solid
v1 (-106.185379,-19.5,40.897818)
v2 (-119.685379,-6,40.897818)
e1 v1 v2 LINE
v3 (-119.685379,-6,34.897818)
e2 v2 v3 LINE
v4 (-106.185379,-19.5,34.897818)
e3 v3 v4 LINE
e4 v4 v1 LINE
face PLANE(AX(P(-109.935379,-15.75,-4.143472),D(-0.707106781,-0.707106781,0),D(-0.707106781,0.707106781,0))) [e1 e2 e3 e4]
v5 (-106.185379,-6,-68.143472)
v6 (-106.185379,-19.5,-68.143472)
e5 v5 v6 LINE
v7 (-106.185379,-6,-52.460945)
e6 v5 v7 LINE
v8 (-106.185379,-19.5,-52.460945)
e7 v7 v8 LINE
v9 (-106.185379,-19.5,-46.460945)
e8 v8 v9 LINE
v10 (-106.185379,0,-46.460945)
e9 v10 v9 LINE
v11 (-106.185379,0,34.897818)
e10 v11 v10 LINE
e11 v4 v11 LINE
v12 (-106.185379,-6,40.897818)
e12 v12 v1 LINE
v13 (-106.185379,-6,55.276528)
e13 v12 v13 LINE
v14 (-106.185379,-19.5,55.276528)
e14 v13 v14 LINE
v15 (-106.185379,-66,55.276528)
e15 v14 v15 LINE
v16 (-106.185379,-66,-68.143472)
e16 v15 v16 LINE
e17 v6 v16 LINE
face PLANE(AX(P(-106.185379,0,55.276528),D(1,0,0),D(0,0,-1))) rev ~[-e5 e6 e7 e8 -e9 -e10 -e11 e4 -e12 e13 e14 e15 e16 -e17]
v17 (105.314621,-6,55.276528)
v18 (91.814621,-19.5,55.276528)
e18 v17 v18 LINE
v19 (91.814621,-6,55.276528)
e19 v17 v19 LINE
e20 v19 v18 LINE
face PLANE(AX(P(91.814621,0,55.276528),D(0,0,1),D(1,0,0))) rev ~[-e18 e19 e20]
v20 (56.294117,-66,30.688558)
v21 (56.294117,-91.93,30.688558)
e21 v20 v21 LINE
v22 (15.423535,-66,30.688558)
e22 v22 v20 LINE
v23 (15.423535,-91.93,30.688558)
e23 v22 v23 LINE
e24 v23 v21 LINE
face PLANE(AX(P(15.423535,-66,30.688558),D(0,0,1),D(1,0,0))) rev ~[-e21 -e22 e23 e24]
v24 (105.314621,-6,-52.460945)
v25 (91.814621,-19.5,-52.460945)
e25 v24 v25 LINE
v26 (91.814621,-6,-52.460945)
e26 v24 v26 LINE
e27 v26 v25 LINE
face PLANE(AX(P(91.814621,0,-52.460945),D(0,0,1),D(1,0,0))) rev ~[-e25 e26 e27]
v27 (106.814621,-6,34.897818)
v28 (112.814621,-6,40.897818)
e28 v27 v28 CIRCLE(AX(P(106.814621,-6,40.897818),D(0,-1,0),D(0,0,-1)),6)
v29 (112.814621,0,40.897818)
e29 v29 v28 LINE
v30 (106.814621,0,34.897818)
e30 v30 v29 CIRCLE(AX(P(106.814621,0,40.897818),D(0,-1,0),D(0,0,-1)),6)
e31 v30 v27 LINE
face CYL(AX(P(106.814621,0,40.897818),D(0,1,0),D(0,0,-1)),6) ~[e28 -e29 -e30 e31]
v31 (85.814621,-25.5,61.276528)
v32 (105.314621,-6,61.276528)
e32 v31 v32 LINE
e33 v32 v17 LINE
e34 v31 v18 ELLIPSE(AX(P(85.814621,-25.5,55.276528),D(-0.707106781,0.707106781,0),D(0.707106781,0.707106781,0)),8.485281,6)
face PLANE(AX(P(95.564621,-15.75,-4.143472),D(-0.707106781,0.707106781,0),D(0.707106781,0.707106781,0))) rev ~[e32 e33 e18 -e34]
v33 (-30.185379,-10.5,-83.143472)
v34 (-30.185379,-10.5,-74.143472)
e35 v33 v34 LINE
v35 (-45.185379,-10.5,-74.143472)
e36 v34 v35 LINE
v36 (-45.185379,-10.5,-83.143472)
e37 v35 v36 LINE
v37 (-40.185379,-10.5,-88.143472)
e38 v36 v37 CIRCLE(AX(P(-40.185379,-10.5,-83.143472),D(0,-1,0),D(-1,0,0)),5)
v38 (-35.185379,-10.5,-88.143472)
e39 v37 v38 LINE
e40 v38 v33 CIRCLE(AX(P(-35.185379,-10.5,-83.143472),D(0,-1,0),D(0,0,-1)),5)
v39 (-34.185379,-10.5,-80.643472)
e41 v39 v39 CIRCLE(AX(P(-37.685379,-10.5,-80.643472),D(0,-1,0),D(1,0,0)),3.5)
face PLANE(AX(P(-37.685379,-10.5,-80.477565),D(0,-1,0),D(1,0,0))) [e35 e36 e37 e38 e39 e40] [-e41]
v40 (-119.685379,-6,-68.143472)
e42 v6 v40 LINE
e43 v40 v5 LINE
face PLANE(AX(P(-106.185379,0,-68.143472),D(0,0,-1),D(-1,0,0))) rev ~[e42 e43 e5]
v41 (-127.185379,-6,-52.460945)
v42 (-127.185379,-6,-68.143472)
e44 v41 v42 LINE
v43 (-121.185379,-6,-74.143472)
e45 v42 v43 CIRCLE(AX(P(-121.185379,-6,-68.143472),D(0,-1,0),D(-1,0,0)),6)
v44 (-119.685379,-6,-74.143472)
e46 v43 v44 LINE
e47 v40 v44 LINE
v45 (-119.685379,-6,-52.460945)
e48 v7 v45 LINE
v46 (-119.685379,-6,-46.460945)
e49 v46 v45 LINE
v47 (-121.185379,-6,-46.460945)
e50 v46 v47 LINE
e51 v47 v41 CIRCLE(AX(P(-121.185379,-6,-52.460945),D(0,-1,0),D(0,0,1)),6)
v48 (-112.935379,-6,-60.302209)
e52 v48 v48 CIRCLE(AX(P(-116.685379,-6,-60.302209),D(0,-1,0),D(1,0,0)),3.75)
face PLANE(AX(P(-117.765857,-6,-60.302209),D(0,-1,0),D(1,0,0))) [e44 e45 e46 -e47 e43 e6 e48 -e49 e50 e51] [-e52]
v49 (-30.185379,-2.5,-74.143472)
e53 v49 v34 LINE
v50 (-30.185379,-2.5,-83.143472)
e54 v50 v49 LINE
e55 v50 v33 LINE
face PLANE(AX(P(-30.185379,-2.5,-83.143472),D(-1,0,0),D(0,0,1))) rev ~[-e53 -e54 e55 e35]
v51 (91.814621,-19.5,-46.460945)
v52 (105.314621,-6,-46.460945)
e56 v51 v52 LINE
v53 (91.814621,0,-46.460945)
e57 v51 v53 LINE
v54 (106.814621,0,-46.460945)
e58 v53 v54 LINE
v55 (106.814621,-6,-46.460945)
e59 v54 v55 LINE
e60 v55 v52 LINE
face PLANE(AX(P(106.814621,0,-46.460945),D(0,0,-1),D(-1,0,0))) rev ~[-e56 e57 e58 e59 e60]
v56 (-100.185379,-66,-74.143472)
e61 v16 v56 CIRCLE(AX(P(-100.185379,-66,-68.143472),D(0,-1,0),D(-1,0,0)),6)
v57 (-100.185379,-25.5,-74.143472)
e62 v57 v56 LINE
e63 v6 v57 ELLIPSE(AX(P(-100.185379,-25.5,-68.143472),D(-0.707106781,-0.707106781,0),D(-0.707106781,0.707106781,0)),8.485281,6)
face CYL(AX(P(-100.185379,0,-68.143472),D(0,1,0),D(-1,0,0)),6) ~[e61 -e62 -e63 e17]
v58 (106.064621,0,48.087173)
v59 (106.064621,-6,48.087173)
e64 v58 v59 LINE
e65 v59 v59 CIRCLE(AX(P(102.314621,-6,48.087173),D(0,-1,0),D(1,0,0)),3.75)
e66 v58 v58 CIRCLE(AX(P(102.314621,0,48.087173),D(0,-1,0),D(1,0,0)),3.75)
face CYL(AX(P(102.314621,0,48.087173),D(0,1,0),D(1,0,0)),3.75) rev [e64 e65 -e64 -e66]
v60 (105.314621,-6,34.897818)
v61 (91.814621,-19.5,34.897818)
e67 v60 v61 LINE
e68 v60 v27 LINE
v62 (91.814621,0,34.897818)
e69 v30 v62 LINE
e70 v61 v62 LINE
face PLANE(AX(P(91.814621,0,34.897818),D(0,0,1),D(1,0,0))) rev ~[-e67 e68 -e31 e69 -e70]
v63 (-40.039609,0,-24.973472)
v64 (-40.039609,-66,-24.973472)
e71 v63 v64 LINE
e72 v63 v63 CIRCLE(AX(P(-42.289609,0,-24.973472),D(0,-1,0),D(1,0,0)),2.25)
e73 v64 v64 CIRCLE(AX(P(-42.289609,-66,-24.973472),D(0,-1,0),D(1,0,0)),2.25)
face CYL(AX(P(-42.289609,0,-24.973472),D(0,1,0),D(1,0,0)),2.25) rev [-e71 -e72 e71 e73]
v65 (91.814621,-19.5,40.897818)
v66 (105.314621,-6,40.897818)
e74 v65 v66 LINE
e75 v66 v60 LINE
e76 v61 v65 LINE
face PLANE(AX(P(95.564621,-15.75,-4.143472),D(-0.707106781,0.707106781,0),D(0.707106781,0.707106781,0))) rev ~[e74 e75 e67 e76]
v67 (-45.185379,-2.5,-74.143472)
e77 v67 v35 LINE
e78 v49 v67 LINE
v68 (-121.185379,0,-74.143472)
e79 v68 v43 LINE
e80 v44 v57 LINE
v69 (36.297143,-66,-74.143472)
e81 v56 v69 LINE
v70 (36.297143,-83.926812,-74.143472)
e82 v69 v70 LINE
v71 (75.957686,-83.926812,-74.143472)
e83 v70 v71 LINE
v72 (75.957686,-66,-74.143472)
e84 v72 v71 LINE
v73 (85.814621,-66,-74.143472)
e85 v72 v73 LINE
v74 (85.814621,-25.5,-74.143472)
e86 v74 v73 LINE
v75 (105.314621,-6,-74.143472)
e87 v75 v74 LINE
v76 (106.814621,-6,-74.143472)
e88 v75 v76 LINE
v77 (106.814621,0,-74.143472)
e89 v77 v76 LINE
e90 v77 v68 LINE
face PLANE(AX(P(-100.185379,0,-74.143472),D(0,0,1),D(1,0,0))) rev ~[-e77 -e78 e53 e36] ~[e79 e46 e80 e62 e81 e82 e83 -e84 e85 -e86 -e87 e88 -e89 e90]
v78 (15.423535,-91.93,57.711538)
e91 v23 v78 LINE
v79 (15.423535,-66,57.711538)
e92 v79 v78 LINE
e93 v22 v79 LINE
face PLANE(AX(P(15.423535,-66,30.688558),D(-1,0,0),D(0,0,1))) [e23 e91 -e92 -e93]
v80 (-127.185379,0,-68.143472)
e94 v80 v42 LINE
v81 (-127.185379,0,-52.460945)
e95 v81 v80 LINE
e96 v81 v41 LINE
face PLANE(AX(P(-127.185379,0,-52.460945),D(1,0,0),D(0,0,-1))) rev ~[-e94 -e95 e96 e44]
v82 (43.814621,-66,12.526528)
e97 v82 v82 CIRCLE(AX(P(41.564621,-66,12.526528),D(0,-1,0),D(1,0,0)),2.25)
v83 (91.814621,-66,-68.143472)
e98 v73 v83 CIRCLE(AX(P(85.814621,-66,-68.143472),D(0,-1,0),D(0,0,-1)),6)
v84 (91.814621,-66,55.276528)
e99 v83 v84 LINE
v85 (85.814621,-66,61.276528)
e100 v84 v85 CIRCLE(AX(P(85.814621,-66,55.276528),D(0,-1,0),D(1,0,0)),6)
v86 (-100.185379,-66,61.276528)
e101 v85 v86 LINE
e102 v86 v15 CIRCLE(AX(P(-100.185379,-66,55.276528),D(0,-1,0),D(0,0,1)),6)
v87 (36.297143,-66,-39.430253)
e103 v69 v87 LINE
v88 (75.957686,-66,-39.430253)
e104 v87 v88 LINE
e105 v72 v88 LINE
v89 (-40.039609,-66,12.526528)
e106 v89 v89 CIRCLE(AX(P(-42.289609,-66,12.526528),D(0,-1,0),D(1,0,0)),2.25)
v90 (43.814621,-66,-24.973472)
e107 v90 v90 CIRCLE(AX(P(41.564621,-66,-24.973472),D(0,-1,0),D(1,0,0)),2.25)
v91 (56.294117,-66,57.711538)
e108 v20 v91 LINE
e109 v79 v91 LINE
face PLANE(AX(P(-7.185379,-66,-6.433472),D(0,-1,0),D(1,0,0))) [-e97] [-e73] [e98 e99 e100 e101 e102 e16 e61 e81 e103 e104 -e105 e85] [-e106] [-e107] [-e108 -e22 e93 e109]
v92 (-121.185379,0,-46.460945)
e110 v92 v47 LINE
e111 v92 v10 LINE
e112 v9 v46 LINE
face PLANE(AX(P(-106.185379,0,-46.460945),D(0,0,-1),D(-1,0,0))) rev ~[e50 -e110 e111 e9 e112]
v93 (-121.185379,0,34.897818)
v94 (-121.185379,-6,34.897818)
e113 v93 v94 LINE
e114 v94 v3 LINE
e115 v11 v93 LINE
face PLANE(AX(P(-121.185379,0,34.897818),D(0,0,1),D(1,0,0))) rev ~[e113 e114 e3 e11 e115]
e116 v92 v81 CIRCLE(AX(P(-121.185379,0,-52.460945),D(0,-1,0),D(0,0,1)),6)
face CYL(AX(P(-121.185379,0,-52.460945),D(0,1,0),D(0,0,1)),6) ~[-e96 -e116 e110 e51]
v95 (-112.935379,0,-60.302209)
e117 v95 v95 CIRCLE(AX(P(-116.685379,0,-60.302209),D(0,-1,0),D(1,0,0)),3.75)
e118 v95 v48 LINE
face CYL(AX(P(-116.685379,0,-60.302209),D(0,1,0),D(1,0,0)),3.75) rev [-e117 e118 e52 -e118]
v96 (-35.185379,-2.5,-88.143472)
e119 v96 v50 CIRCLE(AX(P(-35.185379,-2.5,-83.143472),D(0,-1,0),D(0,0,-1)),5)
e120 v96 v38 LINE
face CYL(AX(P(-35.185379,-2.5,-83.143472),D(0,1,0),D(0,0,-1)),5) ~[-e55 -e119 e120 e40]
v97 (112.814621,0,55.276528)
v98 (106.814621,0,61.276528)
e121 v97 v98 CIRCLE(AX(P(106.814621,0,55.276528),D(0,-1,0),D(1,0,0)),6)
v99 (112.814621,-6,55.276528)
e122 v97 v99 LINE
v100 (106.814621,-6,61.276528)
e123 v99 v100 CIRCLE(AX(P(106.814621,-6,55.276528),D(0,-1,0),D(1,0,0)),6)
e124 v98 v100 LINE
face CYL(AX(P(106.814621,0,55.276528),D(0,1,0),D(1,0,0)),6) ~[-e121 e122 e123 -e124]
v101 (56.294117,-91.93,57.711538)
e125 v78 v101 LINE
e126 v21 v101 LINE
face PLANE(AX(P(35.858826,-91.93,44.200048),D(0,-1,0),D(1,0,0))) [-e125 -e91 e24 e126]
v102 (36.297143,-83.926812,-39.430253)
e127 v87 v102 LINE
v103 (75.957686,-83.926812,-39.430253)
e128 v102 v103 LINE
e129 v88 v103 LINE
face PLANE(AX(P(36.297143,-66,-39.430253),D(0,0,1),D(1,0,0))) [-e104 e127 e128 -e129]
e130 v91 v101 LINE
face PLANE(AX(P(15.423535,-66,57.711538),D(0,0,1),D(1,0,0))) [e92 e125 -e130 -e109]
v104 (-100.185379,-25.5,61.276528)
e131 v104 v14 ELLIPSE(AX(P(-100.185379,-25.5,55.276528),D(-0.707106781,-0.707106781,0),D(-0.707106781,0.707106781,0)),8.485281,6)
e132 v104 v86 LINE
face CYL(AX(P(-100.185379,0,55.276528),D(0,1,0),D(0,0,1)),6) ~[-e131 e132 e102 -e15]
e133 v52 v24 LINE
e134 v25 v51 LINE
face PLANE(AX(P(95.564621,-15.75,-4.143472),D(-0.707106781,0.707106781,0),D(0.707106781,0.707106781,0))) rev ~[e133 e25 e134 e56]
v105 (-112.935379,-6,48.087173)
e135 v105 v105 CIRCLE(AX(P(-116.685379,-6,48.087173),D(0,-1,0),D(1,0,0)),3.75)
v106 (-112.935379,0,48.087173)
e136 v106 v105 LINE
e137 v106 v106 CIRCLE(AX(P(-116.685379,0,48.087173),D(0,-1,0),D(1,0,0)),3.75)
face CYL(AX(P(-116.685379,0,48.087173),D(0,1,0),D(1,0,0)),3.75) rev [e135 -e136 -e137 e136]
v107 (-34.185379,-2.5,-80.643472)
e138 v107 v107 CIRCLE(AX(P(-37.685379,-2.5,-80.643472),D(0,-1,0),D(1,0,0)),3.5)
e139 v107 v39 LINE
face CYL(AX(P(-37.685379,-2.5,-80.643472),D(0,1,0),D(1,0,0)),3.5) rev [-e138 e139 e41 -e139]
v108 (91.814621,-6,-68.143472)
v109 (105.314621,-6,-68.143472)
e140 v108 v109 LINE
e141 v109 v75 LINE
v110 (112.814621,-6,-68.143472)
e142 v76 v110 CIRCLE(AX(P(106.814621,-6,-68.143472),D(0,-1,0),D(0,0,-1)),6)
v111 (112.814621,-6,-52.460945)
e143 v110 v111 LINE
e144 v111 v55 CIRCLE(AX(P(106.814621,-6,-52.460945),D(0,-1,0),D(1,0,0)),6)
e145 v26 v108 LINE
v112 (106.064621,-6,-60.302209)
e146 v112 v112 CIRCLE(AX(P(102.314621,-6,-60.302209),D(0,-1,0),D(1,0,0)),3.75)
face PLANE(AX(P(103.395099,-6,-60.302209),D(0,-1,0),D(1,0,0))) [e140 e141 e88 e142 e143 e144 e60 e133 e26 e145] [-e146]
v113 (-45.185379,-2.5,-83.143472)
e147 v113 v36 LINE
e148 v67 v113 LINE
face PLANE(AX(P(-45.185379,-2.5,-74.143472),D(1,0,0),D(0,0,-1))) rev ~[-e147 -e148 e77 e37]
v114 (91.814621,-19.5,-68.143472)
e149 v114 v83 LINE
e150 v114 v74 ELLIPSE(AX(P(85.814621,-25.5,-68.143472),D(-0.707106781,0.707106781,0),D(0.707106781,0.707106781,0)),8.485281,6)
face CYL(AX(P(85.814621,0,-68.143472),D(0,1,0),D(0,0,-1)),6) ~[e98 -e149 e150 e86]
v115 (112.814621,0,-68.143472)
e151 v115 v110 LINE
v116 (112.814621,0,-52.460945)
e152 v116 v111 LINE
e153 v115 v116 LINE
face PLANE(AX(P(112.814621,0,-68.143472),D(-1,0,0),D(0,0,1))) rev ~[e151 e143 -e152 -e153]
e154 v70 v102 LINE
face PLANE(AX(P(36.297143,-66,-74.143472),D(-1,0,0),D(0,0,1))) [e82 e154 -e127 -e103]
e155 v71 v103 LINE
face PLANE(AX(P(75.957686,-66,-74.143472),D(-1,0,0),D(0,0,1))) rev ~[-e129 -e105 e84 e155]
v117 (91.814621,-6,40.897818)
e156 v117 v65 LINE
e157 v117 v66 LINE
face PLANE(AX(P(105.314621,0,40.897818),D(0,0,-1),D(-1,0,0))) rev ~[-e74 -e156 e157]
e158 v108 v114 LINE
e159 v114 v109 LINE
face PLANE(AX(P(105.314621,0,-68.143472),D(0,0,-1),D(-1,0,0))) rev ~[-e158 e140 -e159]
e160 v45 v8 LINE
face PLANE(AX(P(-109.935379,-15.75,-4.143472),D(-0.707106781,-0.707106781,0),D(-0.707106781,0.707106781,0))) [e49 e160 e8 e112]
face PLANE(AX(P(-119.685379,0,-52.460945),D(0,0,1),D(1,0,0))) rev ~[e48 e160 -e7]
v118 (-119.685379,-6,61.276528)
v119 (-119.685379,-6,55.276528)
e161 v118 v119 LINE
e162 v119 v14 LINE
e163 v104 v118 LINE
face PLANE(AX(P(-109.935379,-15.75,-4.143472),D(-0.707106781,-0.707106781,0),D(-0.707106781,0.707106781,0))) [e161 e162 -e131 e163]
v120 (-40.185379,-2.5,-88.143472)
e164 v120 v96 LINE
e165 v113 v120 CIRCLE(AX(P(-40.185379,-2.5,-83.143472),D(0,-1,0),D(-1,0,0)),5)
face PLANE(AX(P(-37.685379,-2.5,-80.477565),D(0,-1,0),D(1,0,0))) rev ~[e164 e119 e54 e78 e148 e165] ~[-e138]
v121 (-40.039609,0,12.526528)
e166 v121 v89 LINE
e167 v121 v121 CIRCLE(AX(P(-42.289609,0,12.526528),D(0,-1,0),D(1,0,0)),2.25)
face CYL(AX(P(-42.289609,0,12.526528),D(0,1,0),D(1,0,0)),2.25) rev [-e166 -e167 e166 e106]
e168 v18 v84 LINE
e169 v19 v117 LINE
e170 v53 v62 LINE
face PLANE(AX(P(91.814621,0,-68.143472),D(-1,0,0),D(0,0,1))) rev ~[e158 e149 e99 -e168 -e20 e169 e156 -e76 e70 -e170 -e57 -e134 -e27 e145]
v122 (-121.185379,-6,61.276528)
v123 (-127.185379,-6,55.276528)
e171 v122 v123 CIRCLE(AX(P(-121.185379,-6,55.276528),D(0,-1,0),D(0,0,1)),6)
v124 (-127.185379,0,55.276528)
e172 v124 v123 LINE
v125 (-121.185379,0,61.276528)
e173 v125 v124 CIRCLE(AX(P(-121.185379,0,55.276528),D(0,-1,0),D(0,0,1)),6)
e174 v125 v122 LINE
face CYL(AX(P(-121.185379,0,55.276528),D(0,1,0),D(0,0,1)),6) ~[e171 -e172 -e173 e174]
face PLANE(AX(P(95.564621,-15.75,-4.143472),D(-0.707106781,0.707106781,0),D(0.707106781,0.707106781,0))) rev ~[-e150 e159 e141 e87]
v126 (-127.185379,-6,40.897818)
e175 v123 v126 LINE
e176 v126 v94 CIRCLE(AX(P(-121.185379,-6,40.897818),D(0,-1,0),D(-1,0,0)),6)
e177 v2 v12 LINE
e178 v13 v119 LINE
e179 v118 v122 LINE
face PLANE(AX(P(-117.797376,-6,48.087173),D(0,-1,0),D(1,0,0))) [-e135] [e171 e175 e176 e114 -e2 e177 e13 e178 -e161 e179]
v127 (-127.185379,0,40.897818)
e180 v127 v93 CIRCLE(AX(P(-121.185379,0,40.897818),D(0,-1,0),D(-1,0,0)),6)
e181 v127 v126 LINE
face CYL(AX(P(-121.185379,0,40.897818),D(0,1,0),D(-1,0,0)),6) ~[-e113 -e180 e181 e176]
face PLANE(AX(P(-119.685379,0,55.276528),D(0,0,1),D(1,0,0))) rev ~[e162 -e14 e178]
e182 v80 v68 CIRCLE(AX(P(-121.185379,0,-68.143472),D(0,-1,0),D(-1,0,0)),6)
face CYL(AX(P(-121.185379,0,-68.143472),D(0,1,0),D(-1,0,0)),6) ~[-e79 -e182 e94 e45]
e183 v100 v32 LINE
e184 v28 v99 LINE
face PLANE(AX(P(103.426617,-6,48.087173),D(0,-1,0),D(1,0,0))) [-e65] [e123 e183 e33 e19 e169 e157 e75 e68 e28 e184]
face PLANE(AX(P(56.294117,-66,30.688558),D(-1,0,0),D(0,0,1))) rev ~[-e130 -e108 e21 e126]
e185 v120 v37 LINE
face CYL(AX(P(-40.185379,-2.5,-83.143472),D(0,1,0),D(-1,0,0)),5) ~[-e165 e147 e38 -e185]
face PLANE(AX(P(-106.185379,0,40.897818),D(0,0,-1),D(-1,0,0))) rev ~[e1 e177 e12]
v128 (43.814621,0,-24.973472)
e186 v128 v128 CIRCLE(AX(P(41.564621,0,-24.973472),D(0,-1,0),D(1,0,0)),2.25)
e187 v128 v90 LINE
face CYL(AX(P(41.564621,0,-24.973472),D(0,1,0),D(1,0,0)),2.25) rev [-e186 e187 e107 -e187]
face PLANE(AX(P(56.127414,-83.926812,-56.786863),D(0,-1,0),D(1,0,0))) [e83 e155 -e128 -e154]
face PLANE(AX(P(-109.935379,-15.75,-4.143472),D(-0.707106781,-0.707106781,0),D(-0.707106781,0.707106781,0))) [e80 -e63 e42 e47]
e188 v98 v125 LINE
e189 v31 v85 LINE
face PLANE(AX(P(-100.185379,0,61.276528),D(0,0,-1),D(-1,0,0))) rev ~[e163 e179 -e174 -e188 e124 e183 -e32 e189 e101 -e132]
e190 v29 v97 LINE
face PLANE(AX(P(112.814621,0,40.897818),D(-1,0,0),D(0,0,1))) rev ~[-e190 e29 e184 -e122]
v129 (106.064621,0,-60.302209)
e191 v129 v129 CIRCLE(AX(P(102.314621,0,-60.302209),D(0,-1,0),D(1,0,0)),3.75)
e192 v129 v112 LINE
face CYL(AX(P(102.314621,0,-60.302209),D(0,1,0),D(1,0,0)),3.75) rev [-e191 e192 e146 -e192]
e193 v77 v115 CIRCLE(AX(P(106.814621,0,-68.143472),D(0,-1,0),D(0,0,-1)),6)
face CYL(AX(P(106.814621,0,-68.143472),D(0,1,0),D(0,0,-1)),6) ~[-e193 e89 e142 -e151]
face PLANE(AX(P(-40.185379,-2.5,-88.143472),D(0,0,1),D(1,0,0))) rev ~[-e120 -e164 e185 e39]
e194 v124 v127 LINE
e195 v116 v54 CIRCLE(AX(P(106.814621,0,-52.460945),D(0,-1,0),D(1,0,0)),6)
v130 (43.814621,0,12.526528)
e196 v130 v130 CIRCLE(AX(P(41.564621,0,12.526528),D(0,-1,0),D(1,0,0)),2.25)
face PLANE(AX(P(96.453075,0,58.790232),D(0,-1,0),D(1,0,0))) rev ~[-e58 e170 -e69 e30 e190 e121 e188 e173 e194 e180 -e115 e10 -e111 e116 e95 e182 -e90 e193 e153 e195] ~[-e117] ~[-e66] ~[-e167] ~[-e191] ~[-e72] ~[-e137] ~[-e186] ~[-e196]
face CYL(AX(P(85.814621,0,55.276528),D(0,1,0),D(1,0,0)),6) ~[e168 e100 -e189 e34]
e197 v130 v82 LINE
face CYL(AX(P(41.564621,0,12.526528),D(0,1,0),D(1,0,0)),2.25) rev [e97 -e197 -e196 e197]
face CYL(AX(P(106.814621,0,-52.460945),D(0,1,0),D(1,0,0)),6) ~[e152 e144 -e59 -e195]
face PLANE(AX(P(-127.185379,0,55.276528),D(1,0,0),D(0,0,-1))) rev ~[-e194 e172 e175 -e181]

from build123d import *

# Parameters (mm, degrees)
F0_R      = 2.25
F1_DEPTH  = 66
F0_R_2    = 3.75
F2_DEPTH  = 6
F5_W      = 40.8705817536
F5_H      = 27.0229801536
F6_DEPTH  = 25.93
F5_W_2    = 39.6605432034
F5_H_2    = 34.7132187133
F7_DEPTH  = 17.926812
F8_REACH  = 45.9022057631
F9_REACH  = 45.9022057631
F10_START = 2.5
F0_R_3    = 3.5
F10_DEPTH = 8


with BuildPart() as f1:
    # F0 (on Front) → F1 (new body)
    with BuildSketch(Plane.XZ):
        with BuildLine():
            Line((85.8146208827, 61.2765278835), (-100.1853791173, 61.2765278835))
            ThreePointArc((-100.1853791173, 61.2765278835), (-104.4280198044, 59.5191685706), (-106.1853791173, 55.2765278835))
            Line((-106.1853791173, 55.2765278835), (-106.1853791173, 40.8978178835))
            Line((-106.1853791173, 40.8978178835), (-106.1853791173, 34.8978178835))
            Line((-106.1853791173, 34.8978178835), (-106.1853791173, -46.4609452256))
            Line((-106.1853791173, -46.4609452256), (-106.1853791173, -52.4609452256))
            Line((-106.1853791173, -52.4609452256), (-106.1853791173, -68.1434721165))
            ThreePointArc((-106.1853791173, -68.1434721165), (-104.4280198044, -72.3861128036), (-100.1853791173, -74.1434721165))
            Line((-100.1853791173, -74.1434721165), (-45.1853791173, -74.1434721165))
            Line((-45.1853791173, -74.1434721165), (-30.1853791173, -74.1434721165))
            Line((-30.1853791173, -74.1434721165), (85.8146208827, -74.1434721165))
            ThreePointArc((85.8146208827, -74.1434721165), (90.0572615698, -72.3861128036), (91.8146208827, -68.1434721165))
            Line((91.8146208827, -68.1434721165), (91.8146208827, -52.4609452256))
            Line((91.8146208827, -52.4609452256), (91.8146208827, -46.4609452256))
            Line((91.8146208827, -46.4609452256), (91.8146208827, 34.8978178835))
            Line((91.8146208827, 34.8978178835), (91.8146208827, 40.8978178835))
            Line((91.8146208827, 40.8978178835), (91.8146208827, 55.2765278835))
            ThreePointArc((91.8146208827, 55.2765278835), (90.0572615698, 59.5191685706), (85.8146208827, 61.2765278835))
        make_face()
        with Locations((-42.2896091173, -24.9734721165)):
            Circle(F0_R, mode=Mode.SUBTRACT)
        with Locations((41.5646208827, -24.9734721165)):
            Circle(F0_R, mode=Mode.SUBTRACT)
        with Locations((-42.2896091173, 12.5265278835)):
            Circle(F0_R, mode=Mode.SUBTRACT)
        with Locations((41.5646208827, 12.5265278835)):
            Circle(F0_R, mode=Mode.SUBTRACT)
    extrude(amount=F1_DEPTH)

    # F0 (on Front) → F2 (join)
    with BuildSketch(Plane.XZ):
        with BuildLine():
            Line((-106.1853791173, 40.8978178835), (-106.1853791173, 55.2765278835))
            Line((-106.1853791173, 55.2765278835), (-119.6853791173, 55.2765278835))
            Line((-119.6853791173, 55.2765278835), (-119.6853791173, 61.2765278835))
            Line((-119.6853791173, 61.2765278835), (-121.1853791173, 61.2765278835))
            ThreePointArc((-121.1853791173, 61.2765278835), (-125.4280198044, 59.5191685706), (-127.1853791173, 55.2765278835))
            Line((-127.1853791173, 55.2765278835), (-127.1853791173, 40.8978178835))
            ThreePointArc((-127.1853791173, 40.8978178835), (-125.4280198044, 36.6551771964), (-121.1853791173, 34.8978178835))
            Line((-121.1853791173, 34.8978178835), (-119.6853791173, 34.8978178835))
            Line((-119.6853791173, 34.8978178835), (-119.6853791173, 40.8978178835))
            Line((-119.6853791173, 40.8978178835), (-106.1853791173, 40.8978178835))
        make_face()
        with Locations((-116.6853791173, 48.0871728835)):
            Circle(F0_R_2, mode=Mode.SUBTRACT)
        with BuildLine():
            Line((106.8146208827, 61.2765278835), (105.3146208827, 61.2765278835))
            Line((105.3146208827, 61.2765278835), (105.3146208827, 55.2765278835))
            Line((105.3146208827, 55.2765278835), (91.8146208827, 55.2765278835))
            Line((91.8146208827, 55.2765278835), (91.8146208827, 40.8978178835))
            Line((91.8146208827, 40.8978178835), (105.3146208827, 40.8978178835))
            Line((105.3146208827, 40.8978178835), (105.3146208827, 34.8978178835))
            Line((105.3146208827, 34.8978178835), (106.8146208827, 34.8978178835))
            ThreePointArc((106.8146208827, 34.8978178835), (111.0572615698, 36.6551771964), (112.8146208827, 40.8978178835))
            Line((112.8146208827, 40.8978178835), (112.8146208827, 55.2765278835))
            ThreePointArc((112.8146208827, 55.2765278835), (111.0572615698, 59.5191685706), (106.8146208827, 61.2765278835))
        make_face()
        with Locations((102.3146208827, 48.0871728835)):
            Circle(F0_R_2, mode=Mode.SUBTRACT)
        with BuildLine():
            Line((105.3146208827, -52.4609452256), (91.8146208827, -52.4609452256))
            Line((91.8146208827, -52.4609452256), (91.8146208827, -68.1434721165))
            Line((91.8146208827, -68.1434721165), (105.3146208827, -68.1434721165))
            Line((105.3146208827, -68.1434721165), (105.3146208827, -74.1434721165))
            Line((105.3146208827, -74.1434721165), (106.8146208827, -74.1434721165))
            ThreePointArc((106.8146208827, -74.1434721165), (111.0572615698, -72.3861128036), (112.8146208827, -68.1434721165))
            Line((112.8146208827, -68.1434721165), (112.8146208827, -52.4609452256))
            ThreePointArc((112.8146208827, -52.4609452256), (111.0572615698, -48.2183045385), (106.8146208827, -46.4609452256))
            Line((106.8146208827, -46.4609452256), (105.3146208827, -46.4609452256))
            Line((105.3146208827, -46.4609452256), (105.3146208827, -52.4609452256))
        make_face()
        with Locations((102.3146208827, -60.302208671)):
            Circle(F0_R_2, mode=Mode.SUBTRACT)
        with BuildLine():
            Line((-106.1853791173, -68.1434721165), (-106.1853791173, -52.4609452256))
            Line((-106.1853791173, -52.4609452256), (-119.6853791173, -52.4609452256))
            Line((-119.6853791173, -52.4609452256), (-119.6853791173, -46.4609452256))
            Line((-119.6853791173, -46.4609452256), (-121.1853791173, -46.4609452256))
            ThreePointArc((-121.1853791173, -46.4609452256), (-125.4280198044, -48.2183045385), (-127.1853791173, -52.4609452256))
            Line((-127.1853791173, -52.4609452256), (-127.1853791173, -68.1434721165))
            ThreePointArc((-127.1853791173, -68.1434721165), (-125.4280198044, -72.3861128036), (-121.1853791173, -74.1434721165))
            Line((-121.1853791173, -74.1434721165), (-119.6853791173, -74.1434721165))
            Line((-119.6853791173, -74.1434721165), (-119.6853791173, -68.1434721165))
            Line((-119.6853791173, -68.1434721165), (-106.1853791173, -68.1434721165))
        make_face()
        with Locations((-116.6853791173, -60.302208671)):
            Circle(F0_R_2, mode=Mode.SUBTRACT)
        with BuildLine():
            ThreePointArc((-106.1853791173, 55.2765278835), (-104.4280198044, 59.5191685706), (-100.1853791173, 61.2765278835))
            Line((-100.1853791173, 61.2765278835), (-106.1853791173, 61.2765278835))
            Line((-106.1853791173, 61.2765278835), (-119.6853791173, 61.2765278835))
            Line((-119.6853791173, 61.2765278835), (-119.6853791173, 55.2765278835))
            Line((-119.6853791173, 55.2765278835), (-106.1853791173, 55.2765278835))
        make_face()
        Polygon((-106.1853791173, 34.8978178835), (-106.1853791173, 40.8978178835), (-119.6853791173, 40.8978178835), (-119.6853791173, 34.8978178835), (-112.1853791173, 34.8978178835), align=None)
        Polygon((-106.1853791173, -52.4609452256), (-106.1853791173, -46.4609452256), (-112.1853791173, -46.4609452256), (-119.6853791173, -46.4609452256), (-119.6853791173, -52.4609452256), align=None)
        with BuildLine():
            ThreePointArc((-100.1853791173, -74.1434721165), (-104.4280198044, -72.3861128036), (-106.1853791173, -68.1434721165))
            Line((-106.1853791173, -68.1434721165), (-119.6853791173, -68.1434721165))
            Line((-119.6853791173, -68.1434721165), (-119.6853791173, -74.1434721165))
            Line((-119.6853791173, -74.1434721165), (-100.1853791173, -74.1434721165))
        make_face()
        with BuildLine():
            Line((105.3146208827, -68.1434721165), (91.8146208827, -68.1434721165))
            ThreePointArc((91.8146208827, -68.1434721165), (90.0572615698, -72.3861128036), (85.8146208827, -74.1434721165))
            Line((85.8146208827, -74.1434721165), (105.3146208827, -74.1434721165))
            Line((105.3146208827, -74.1434721165), (105.3146208827, -68.1434721165))
        make_face()
        Polygon((97.8146208827, -46.4609452256), (91.8146208827, -46.4609452256), (91.8146208827, -52.4609452256), (105.3146208827, -52.4609452256), (105.3146208827, -46.4609452256), align=None)
        Polygon((105.3146208827, 40.8978178835), (91.8146208827, 40.8978178835), (91.8146208827, 34.8978178835), (97.8146208827, 34.8978178835), (105.3146208827, 34.8978178835), align=None)
        with BuildLine():
            Line((105.3146208827, 61.2765278835), (85.8146208827, 61.2765278835))
            ThreePointArc((85.8146208827, 61.2765278835), (90.0572615698, 59.5191685706), (91.8146208827, 55.2765278835))
            Line((91.8146208827, 55.2765278835), (105.3146208827, 55.2765278835))
            Line((105.3146208827, 55.2765278835), (105.3146208827, 61.2765278835))
        make_face()
    extrude(amount=F2_DEPTH)

    # F5 (on face) → F6 (join)
    with BuildSketch(Plane.XZ.offset(66)):
        with Locations((35.8588262461, 44.2000478506)):
            Rectangle(F5_W, F5_H)
    extrude(amount=F6_DEPTH)

    # F5 (on face) → F7 (join)
    with BuildSketch(Plane.XZ.offset(66)):
        with Locations((56.1274141073, -56.7868627598)):
            Rectangle(F5_W_2, F5_H_2)
    extrude(amount=F7_DEPTH)

    f8_end = Plane(origin=(-109.9353791173, -15.75, -4.1434721165), x_dir=(-0.7071067812, 0.7071067812, 0), z_dir=(-0.7071067812, -0.7071067812, 0))
    # F0 (on Front) → F8 (join, up to a plane its end follows)
    with BuildSketch(Plane.XZ):
        with BuildLine():
            ThreePointArc((-106.1853791173, 55.2765278835), (-104.4280198044, 59.5191685706), (-100.1853791173, 61.2765278835))
            Line((-100.1853791173, 61.2765278835), (-106.1853791173, 61.2765278835))
            Line((-106.1853791173, 61.2765278835), (-119.6853791173, 61.2765278835))
            Line((-119.6853791173, 61.2765278835), (-119.6853791173, 55.2765278835))
            Line((-119.6853791173, 55.2765278835), (-106.1853791173, 55.2765278835))
        make_face()
        Polygon((-106.1853791173, 34.8978178835), (-106.1853791173, 40.8978178835), (-119.6853791173, 40.8978178835), (-119.6853791173, 34.8978178835), (-112.1853791173, 34.8978178835), align=None)
        Polygon((-106.1853791173, -52.4609452256), (-106.1853791173, -46.4609452256), (-112.1853791173, -46.4609452256), (-119.6853791173, -46.4609452256), (-119.6853791173, -52.4609452256), align=None)
        with BuildLine():
            ThreePointArc((-100.1853791173, -74.1434721165), (-104.4280198044, -72.3861128036), (-106.1853791173, -68.1434721165))
            Line((-106.1853791173, -68.1434721165), (-119.6853791173, -68.1434721165))
            Line((-119.6853791173, -68.1434721165), (-119.6853791173, -74.1434721165))
            Line((-119.6853791173, -74.1434721165), (-100.1853791173, -74.1434721165))
        make_face()
    f8_long = extrude(amount=F8_REACH, mode=Mode.PRIVATE)
    add(split(f8_long, bisect_by=f8_end, keep=Keep.BOTTOM, mode=Mode.PRIVATE))

    f9_end = Plane(origin=(95.5646208827, -15.75, -4.1434721165), x_dir=(0.7071067812, 0.7071067812, 0), z_dir=(-0.7071067812, 0.7071067812, 0))
    # F0 (on Front) → F9 (join, up to a plane its end follows)
    with BuildSketch(Plane.XZ):
        with BuildLine():
            Line((105.3146208827, 61.2765278835), (85.8146208827, 61.2765278835))
            ThreePointArc((85.8146208827, 61.2765278835), (90.0572615698, 59.5191685706), (91.8146208827, 55.2765278835))
            Line((91.8146208827, 55.2765278835), (105.3146208827, 55.2765278835))
            Line((105.3146208827, 55.2765278835), (105.3146208827, 61.2765278835))
        make_face()
        Polygon((105.3146208827, 40.8978178835), (91.8146208827, 40.8978178835), (91.8146208827, 34.8978178835), (97.8146208827, 34.8978178835), (105.3146208827, 34.8978178835), align=None)
        Polygon((97.8146208827, -46.4609452256), (91.8146208827, -46.4609452256), (91.8146208827, -52.4609452256), (105.3146208827, -52.4609452256), (105.3146208827, -46.4609452256), align=None)
        with BuildLine():
            Line((105.3146208827, -68.1434721165), (91.8146208827, -68.1434721165))
            ThreePointArc((91.8146208827, -68.1434721165), (90.0572615698, -72.3861128036), (85.8146208827, -74.1434721165))
            Line((85.8146208827, -74.1434721165), (105.3146208827, -74.1434721165))
            Line((105.3146208827, -74.1434721165), (105.3146208827, -68.1434721165))
        make_face()
    f9_long = extrude(amount=F9_REACH, mode=Mode.PRIVATE)
    add(split(f9_long, bisect_by=f9_end, keep=Keep.TOP, mode=Mode.PRIVATE))

    # F0 (on Front) → F10 (join)
    with BuildSketch(Plane.XZ.offset(F10_START)):
        with BuildLine():
            Line((-30.1853791173, -74.1434721165), (-45.1853791173, -74.1434721165))
            Line((-45.1853791173, -74.1434721165), (-45.1853791173, -83.1434721165))
            ThreePointArc((-45.1853791173, -83.1434721165), (-43.7209130232, -86.6790060224), (-40.1853791173, -88.1434721165))
            Line((-40.1853791173, -88.1434721165), (-35.1853791173, -88.1434721165))
            ThreePointArc((-35.1853791173, -88.1434721165), (-31.6498452114, -86.6790060224), (-30.1853791173, -83.1434721165))
            Line((-30.1853791173, -83.1434721165), (-30.1853791173, -74.1434721165))
        make_face()
        with Locations((-37.6853791173, -80.6434721165)):
            Circle(F0_R_3, mode=Mode.SUBTRACT)
    extrude(amount=F10_DEPTH)


solid = f1.part
